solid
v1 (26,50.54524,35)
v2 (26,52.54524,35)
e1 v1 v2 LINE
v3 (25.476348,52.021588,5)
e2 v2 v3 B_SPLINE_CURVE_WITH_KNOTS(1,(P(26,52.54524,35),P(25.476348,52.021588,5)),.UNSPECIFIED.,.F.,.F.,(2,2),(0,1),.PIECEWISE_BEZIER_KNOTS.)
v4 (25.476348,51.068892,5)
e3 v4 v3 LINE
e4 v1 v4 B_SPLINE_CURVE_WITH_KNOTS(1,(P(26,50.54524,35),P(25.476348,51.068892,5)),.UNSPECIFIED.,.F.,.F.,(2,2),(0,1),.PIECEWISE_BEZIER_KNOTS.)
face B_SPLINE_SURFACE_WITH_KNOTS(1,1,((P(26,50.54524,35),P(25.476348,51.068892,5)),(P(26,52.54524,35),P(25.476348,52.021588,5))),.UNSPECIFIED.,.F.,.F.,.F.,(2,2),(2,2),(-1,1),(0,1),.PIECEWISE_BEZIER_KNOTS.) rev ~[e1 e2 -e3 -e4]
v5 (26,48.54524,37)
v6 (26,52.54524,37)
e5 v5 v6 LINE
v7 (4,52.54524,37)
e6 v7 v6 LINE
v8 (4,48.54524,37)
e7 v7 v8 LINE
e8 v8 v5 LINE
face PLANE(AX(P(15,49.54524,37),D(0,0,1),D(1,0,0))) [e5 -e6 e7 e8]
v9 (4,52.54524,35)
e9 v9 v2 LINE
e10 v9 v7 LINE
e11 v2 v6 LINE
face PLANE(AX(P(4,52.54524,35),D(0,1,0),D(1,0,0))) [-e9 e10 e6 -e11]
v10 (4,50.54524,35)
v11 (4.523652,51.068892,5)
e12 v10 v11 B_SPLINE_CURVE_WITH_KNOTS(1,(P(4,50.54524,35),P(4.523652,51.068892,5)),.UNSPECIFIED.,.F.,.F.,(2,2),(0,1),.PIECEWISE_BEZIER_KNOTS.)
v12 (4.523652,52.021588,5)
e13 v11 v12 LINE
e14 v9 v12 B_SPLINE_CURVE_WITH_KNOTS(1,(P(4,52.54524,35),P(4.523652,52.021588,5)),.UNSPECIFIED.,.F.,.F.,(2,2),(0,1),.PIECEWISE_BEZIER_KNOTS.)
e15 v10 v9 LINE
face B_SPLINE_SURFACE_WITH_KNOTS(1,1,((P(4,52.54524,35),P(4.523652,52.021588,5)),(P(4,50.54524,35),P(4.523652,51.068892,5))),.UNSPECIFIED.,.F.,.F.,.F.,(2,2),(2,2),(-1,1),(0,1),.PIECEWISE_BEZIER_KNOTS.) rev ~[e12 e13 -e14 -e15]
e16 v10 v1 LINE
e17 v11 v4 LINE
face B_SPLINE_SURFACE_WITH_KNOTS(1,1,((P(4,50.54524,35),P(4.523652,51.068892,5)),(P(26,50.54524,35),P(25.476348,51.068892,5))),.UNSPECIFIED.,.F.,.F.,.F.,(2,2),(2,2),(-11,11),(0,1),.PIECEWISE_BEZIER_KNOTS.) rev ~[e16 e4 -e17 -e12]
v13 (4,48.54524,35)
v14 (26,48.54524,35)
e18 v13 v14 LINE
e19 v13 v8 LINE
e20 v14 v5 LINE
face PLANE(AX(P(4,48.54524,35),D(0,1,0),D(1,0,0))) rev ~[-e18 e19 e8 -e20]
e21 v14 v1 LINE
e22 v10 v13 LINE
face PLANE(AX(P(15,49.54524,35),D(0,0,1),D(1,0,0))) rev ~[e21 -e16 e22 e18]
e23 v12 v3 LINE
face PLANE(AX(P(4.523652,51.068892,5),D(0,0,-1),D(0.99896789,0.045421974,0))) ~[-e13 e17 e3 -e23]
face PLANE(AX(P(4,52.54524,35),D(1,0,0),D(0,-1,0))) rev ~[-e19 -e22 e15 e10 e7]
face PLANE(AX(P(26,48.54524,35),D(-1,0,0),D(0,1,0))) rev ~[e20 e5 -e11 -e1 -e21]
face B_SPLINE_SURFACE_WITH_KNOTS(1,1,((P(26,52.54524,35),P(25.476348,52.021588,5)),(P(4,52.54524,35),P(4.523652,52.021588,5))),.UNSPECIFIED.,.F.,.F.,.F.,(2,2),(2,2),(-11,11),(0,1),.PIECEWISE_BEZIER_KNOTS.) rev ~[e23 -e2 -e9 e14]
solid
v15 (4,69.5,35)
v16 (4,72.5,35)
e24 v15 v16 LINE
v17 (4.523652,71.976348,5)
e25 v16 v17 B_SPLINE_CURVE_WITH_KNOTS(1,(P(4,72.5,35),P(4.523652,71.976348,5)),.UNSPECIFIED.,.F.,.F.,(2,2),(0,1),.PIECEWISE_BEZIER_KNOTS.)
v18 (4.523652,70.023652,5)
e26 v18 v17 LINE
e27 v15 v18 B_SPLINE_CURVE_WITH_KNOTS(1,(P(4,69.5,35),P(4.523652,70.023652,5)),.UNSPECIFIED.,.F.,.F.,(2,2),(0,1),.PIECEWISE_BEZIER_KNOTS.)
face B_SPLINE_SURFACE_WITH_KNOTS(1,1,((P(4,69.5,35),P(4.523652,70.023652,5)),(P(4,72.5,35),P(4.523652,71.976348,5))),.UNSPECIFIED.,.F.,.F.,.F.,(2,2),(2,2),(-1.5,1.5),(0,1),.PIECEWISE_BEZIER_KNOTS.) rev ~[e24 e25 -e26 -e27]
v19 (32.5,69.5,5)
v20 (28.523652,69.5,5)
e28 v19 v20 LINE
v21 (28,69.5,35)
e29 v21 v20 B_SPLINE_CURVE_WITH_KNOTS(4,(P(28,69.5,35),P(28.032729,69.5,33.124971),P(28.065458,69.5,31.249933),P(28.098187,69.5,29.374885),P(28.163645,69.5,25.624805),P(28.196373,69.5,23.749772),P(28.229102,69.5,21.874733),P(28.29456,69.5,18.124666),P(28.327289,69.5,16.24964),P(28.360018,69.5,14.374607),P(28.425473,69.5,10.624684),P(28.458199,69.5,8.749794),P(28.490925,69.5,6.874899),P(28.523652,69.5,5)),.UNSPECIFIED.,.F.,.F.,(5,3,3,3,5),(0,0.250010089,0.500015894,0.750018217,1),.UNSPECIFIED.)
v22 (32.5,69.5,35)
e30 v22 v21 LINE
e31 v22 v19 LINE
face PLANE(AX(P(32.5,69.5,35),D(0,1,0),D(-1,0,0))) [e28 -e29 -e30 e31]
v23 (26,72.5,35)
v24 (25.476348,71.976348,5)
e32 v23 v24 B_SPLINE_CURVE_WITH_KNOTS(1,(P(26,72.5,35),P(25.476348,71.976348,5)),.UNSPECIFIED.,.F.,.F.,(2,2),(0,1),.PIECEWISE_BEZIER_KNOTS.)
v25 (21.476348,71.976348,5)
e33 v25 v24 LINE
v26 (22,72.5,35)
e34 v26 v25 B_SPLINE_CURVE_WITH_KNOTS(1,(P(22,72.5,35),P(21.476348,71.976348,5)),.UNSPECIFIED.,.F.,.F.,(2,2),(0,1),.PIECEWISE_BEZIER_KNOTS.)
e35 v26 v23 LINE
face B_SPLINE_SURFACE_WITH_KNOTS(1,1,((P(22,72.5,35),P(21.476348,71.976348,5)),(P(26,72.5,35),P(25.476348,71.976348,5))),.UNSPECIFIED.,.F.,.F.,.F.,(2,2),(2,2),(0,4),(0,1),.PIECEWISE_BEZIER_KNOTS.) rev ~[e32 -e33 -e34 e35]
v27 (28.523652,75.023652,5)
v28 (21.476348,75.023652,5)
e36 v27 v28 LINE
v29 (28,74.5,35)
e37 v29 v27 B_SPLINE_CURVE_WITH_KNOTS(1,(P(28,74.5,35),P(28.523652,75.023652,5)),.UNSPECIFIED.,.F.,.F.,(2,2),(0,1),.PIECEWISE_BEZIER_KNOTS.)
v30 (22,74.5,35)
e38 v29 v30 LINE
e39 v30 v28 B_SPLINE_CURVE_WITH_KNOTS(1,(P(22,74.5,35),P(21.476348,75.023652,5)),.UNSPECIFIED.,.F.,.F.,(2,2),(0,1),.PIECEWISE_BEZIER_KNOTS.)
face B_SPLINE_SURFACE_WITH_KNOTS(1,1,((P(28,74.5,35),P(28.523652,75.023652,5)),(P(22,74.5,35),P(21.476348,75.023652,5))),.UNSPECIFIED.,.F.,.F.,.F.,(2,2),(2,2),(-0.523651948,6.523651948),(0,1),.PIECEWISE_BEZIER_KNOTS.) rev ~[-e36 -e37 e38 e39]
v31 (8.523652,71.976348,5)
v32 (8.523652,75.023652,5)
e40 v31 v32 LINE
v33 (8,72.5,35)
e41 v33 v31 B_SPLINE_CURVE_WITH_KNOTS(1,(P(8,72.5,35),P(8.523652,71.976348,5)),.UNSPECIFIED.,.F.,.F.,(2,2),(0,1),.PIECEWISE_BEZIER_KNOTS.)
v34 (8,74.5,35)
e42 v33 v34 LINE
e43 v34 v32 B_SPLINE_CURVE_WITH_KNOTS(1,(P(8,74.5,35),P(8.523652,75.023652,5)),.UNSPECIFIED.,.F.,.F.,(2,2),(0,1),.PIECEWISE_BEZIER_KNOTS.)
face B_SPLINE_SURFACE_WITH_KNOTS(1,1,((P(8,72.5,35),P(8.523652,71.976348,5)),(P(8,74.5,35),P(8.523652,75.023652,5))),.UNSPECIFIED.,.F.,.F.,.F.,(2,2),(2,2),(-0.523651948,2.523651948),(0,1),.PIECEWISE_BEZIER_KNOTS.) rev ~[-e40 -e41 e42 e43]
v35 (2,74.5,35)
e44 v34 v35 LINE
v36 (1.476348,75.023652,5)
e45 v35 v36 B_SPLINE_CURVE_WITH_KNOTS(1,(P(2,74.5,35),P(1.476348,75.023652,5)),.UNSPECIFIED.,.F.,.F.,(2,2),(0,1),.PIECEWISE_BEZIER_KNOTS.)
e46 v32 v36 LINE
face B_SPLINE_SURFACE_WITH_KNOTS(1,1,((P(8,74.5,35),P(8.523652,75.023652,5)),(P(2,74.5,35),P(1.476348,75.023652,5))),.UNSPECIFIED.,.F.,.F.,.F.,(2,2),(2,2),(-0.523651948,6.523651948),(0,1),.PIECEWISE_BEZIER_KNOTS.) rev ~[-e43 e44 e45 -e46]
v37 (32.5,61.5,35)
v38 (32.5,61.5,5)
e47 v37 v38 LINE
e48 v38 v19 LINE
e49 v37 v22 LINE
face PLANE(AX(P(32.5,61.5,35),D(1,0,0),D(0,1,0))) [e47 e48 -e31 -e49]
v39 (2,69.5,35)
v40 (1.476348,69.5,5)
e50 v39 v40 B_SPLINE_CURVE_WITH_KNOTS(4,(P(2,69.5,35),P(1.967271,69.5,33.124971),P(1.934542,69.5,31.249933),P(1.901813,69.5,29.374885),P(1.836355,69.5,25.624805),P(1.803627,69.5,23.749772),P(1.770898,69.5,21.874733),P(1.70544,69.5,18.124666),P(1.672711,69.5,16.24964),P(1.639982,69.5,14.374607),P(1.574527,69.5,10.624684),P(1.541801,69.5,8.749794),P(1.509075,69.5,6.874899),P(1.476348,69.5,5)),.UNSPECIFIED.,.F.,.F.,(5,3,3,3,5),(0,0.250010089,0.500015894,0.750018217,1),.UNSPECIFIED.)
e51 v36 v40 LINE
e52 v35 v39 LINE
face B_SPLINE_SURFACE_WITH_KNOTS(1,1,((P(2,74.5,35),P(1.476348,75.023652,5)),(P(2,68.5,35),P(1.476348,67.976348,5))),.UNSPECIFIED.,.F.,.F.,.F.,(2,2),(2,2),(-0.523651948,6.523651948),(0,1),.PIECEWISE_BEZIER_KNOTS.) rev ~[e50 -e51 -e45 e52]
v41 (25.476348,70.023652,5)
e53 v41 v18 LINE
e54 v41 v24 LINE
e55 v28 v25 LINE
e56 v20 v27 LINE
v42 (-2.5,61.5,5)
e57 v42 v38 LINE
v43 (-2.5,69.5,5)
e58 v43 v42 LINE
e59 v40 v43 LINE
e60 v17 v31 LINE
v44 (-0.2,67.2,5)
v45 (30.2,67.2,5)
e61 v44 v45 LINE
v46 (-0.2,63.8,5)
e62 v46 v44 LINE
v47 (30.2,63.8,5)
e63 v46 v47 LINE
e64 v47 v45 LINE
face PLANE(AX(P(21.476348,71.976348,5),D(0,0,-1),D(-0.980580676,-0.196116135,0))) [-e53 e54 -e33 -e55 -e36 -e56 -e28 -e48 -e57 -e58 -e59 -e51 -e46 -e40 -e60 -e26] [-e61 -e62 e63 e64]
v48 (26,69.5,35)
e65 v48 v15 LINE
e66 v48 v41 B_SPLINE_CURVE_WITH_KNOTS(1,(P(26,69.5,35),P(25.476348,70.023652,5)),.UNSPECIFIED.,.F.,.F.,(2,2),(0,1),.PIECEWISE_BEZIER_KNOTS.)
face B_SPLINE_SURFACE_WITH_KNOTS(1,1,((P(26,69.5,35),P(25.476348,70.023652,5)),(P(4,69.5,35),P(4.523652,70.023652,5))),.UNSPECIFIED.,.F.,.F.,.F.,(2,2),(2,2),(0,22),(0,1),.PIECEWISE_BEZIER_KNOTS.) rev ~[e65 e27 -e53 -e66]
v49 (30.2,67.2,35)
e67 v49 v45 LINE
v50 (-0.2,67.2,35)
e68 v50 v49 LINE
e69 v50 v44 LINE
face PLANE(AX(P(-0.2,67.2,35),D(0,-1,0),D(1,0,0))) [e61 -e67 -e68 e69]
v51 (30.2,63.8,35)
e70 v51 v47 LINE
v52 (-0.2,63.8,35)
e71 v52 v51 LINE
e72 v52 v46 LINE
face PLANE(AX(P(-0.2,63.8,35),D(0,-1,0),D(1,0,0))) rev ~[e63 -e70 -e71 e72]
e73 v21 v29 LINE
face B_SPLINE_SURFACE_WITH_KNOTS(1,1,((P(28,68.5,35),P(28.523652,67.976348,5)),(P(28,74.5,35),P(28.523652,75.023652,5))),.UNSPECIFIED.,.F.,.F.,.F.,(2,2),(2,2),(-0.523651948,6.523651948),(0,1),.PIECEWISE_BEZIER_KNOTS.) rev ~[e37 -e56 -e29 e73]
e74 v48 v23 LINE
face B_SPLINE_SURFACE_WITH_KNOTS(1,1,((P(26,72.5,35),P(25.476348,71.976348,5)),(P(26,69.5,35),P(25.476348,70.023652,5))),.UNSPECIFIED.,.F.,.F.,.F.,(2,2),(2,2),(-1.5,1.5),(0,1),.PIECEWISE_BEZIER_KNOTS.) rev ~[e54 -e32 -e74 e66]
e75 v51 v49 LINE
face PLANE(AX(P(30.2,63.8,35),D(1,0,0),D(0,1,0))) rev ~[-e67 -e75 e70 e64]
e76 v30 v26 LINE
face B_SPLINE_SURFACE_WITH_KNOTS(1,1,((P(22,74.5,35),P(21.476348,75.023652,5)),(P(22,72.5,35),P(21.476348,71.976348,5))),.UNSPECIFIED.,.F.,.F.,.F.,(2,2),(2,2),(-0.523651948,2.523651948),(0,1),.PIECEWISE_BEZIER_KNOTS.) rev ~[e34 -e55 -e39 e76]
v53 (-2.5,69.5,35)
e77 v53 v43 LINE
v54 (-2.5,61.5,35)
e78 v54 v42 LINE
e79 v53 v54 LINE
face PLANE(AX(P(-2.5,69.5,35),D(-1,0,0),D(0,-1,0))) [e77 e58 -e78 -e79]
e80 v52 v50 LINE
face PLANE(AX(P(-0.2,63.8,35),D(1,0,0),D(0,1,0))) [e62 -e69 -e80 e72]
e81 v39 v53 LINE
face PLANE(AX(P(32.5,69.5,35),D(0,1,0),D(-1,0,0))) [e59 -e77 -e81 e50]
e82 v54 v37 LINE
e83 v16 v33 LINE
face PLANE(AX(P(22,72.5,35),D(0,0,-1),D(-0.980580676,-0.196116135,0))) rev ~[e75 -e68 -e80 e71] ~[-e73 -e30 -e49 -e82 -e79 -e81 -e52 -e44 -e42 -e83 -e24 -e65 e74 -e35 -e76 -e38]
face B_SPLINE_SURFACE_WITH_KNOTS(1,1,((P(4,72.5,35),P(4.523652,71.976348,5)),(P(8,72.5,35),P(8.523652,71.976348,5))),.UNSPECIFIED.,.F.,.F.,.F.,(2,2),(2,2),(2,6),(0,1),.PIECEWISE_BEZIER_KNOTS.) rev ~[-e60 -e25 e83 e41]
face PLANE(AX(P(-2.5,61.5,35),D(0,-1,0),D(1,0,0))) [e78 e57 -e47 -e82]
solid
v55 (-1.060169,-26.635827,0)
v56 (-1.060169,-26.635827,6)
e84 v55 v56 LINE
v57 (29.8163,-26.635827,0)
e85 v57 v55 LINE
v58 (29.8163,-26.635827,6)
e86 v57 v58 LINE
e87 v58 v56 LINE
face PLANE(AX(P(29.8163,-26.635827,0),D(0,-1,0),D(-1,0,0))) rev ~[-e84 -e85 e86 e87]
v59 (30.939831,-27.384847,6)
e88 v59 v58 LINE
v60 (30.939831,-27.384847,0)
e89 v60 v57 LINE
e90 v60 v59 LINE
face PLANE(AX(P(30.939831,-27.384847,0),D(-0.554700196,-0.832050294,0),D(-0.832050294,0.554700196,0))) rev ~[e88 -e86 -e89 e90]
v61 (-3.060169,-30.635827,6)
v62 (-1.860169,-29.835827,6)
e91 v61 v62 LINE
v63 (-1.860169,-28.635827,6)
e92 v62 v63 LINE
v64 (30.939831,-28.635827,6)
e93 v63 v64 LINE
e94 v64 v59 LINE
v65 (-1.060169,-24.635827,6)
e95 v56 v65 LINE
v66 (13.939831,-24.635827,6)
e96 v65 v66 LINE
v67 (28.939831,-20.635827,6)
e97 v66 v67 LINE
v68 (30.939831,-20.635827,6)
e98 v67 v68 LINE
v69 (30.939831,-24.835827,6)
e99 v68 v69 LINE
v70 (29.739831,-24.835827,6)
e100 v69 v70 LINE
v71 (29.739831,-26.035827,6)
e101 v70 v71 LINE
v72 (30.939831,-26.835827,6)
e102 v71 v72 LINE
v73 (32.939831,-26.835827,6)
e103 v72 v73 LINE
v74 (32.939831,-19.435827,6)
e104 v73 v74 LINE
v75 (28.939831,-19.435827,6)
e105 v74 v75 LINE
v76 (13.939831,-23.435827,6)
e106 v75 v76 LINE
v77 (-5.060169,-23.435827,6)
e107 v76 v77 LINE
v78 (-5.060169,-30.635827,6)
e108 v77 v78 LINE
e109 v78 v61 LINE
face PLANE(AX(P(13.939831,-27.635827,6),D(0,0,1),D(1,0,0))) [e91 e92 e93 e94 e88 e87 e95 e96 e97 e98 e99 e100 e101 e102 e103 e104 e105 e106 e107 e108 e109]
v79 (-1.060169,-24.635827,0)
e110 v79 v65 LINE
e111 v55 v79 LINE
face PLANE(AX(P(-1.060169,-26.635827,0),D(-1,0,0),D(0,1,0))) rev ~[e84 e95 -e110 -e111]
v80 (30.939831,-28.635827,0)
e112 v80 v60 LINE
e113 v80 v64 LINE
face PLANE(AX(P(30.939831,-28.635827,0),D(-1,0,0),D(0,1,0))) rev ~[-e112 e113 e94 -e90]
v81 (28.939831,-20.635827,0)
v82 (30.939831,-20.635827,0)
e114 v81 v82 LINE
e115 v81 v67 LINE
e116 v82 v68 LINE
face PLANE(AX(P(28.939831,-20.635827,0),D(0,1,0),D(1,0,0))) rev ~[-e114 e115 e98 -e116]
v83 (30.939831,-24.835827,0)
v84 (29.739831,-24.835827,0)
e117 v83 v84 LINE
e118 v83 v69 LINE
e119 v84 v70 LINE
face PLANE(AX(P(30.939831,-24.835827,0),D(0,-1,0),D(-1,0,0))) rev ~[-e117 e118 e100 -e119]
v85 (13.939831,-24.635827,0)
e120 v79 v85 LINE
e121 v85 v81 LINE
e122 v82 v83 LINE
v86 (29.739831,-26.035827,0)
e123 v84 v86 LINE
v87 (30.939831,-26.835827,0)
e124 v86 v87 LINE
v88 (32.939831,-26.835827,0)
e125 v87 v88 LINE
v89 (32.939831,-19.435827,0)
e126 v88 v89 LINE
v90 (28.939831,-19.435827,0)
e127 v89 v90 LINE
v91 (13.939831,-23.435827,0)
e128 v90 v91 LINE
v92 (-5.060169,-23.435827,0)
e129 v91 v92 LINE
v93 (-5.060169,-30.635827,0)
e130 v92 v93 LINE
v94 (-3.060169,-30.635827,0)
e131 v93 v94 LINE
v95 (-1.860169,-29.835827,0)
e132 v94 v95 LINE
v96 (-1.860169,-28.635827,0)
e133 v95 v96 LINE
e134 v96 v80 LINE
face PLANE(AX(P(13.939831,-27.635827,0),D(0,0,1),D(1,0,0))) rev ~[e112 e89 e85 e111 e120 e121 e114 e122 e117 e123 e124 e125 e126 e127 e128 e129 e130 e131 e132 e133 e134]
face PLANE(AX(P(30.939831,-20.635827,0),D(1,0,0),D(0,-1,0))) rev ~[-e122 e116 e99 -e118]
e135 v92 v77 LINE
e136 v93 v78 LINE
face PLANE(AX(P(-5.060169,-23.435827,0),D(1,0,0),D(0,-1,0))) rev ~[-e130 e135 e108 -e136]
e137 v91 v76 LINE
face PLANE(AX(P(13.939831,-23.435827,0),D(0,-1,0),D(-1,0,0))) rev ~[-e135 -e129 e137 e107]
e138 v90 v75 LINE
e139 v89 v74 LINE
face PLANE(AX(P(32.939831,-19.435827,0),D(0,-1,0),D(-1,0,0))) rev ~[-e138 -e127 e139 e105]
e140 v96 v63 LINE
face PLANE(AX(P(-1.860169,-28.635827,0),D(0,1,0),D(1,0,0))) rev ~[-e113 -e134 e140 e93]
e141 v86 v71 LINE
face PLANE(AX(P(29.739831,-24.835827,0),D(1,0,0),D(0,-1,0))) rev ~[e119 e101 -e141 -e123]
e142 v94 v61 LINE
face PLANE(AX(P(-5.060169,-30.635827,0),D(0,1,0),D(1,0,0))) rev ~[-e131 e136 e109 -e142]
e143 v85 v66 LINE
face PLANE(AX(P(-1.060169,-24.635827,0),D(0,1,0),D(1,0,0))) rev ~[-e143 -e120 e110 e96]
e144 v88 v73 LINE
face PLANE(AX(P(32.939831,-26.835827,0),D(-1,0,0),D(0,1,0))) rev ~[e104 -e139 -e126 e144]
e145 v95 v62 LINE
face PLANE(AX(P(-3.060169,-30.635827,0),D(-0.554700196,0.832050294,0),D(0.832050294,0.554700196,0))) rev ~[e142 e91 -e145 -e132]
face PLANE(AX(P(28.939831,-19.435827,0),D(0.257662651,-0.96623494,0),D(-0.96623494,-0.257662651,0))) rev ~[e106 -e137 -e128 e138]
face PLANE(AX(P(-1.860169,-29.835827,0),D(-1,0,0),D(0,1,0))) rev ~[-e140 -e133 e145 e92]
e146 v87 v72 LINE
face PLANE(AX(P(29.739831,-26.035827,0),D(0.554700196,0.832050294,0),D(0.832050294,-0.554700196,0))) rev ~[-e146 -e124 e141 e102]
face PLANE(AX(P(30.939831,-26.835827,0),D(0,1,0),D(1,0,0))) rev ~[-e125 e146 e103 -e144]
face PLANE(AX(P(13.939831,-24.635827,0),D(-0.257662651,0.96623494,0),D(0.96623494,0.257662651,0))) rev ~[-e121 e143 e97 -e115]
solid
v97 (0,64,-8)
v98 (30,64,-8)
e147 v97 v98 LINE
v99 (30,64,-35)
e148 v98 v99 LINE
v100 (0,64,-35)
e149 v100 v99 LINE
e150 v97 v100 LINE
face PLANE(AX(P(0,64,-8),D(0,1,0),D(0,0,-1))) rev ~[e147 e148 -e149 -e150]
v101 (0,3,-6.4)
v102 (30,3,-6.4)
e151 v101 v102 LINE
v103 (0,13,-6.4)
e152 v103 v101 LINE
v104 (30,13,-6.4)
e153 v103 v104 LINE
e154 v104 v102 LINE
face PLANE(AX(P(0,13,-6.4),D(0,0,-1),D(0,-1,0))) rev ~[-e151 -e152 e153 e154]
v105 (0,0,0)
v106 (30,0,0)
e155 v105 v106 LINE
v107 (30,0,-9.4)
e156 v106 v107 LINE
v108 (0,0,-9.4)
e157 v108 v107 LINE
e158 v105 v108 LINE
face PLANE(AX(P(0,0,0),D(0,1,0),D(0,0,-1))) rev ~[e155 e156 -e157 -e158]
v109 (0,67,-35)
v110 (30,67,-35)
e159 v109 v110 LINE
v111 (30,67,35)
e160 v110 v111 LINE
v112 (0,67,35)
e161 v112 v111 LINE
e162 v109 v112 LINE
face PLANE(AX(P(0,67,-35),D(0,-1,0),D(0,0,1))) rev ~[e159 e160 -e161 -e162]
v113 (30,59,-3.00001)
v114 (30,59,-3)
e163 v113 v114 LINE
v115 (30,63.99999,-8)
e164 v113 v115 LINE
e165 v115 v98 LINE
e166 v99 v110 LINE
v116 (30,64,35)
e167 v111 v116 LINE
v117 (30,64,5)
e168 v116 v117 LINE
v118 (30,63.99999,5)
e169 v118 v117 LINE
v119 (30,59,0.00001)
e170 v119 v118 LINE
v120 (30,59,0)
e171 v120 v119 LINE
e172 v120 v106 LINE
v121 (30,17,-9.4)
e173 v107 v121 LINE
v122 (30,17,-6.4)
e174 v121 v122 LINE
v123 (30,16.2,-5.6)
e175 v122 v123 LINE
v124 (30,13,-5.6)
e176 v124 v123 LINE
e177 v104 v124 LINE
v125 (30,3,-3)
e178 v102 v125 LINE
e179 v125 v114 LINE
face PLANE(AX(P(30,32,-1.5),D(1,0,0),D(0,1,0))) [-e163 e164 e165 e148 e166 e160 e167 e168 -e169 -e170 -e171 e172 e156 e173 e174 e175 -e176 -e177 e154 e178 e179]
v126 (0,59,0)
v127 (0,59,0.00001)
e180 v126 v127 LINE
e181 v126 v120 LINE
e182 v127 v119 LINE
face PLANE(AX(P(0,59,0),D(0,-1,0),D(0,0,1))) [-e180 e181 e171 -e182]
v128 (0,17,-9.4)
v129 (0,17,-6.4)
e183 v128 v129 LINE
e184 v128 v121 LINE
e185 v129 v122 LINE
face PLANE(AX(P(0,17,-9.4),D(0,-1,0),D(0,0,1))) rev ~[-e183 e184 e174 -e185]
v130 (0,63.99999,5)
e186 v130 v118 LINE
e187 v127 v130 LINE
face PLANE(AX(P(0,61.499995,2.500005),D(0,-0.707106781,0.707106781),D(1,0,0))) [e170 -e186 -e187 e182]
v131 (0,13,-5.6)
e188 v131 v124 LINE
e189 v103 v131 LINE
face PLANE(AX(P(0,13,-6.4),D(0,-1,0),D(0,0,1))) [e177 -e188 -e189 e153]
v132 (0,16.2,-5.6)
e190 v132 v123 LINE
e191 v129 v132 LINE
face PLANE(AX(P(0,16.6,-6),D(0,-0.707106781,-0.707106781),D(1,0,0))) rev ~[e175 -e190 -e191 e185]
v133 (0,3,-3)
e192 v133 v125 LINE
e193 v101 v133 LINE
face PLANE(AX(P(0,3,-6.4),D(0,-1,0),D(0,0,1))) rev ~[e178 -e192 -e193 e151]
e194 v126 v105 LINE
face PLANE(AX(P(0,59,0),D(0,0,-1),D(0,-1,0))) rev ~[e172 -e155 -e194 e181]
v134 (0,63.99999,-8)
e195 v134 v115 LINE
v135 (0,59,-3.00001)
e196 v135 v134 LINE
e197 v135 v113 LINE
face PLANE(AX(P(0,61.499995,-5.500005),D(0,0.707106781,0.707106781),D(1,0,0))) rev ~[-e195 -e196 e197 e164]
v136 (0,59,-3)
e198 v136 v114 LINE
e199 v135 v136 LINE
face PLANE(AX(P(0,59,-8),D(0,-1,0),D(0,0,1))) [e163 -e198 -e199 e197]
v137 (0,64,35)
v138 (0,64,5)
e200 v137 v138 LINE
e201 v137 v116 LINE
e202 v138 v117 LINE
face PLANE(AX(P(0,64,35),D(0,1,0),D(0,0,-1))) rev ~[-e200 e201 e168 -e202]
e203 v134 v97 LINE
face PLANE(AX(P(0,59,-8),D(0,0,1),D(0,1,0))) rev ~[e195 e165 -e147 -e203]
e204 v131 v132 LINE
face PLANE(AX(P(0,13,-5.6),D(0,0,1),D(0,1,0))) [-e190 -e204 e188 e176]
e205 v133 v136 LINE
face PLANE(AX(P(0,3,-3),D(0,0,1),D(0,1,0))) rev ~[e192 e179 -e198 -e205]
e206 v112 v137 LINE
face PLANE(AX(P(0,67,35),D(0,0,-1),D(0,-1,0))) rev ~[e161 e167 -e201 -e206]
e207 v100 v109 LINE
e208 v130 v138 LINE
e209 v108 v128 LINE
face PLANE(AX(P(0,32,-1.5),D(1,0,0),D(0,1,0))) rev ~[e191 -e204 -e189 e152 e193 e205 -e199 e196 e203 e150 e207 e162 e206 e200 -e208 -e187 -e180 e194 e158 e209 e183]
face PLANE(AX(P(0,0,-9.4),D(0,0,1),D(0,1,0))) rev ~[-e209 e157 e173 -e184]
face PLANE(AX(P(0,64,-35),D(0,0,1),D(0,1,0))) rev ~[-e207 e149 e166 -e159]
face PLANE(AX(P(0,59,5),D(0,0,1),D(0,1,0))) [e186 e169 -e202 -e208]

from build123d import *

# Parameters (mm, degrees)
F0_W      = 5
F0_H      = 5
F0_W_2    = 4
F0_H_2    = 0.8
F1_DEPTH  = 30
F3_W      = 30.4
F3_H      = 3.4
F4_DEPTH  = 30
F5_SIZE   = 0.8
F6_SIZE   = 4.99999
F3_W_2    = 22
F3_H_2    = 2
F7_DEPTH  = 30
F7_TAPER  = 1
F8_DEPTH  = 2
F9_W      = 30
F9_H      = 2
F9_W_2    = 15
F9_H_2    = 1.2
F9_W_3    = 2
F10_DEPTH = 6
F3_W_3    = 2
F3_H_3    = 3
F11_DEPTH = 30
F11_TAPER = -1


# Not quite as in the source:
# - a fillet or chamfer is up to 0.001 mm smaller than in the source, because OpenCascade refuses the exact size
# - a feature names something its author has since deleted; it is built from what else it names


with BuildPart() as f1:
    # F0 (on Right) → F1 (new body)
    with BuildSketch(Plane.YZ):
        Polygon((59, 0), (0, 0), (0, -3), (3, -3), (59, -3), (64, -3), (64, 0), align=None)
        with Locations((61.5, 2.5)):
            Rectangle(F0_W, F0_H)
        Polygon((3, -3), (0, -3), (0, -9.4), (3, -9.4), (3, -6.4), align=None)
        Polygon((67, 0), (64, 0), (64, -3), (64, -8), (64, -35), (67, -35), align=None)
        Polygon((64, 5), (64, 0), (67, 0), (67, 35), (64, 35), align=None)
        with Locations((61.5, -5.5)):
            Rectangle(F0_W, F0_H)
        Polygon((13, -6.4), (3, -6.4), (3, -9.4), (17, -9.4), (17, -6.4), align=None)
        with Locations((15, -6)):
            Rectangle(F0_W_2, F0_H_2)
    extrude(amount=F1_DEPTH)

    # F5
    f5_edges = [f1.edges().sort_by_distance(p)[0] for p in [
        (15, 17, -5.6),
    ]]
    chamfer(f5_edges, length=F5_SIZE)

    # F6 (size 5 in the source; OpenCascade refuses exactly that, so slightly less here)
    f6_edges = [f1.edges().sort_by_distance(p)[0] for p in [
        (15, 59, 5),
        (15, 59, -8),
    ]]
    chamfer(f6_edges, length=F6_SIZE)


with BuildPart() as f4:
    # F3 (on offset) → F4 (new body)
    with BuildSketch(Plane.XY.offset(35)):
        Polygon((2, 69.5), (-2.5, 69.5), (-2.5, 61.5), (32.5, 61.5), (32.5, 69.5), (28, 69.5), (28, 68.5), (2, 68.5), align=None)
        with Locations((15, 65.5)):
            Rectangle(F3_W, F3_H, mode=Mode.SUBTRACT)
        Polygon((4, 69.5), (2, 69.5), (2, 68.5), (28, 68.5), (28, 69.5), (26, 69.5), align=None)
    extrude(amount=-F4_DEPTH)

    # F3 (on offset) → F11 (join)
    with BuildSketch(Plane.XY.offset(35)):
        Polygon((22, 72.5), (26, 72.5), (28, 72.5), (28, 74.5), (22, 74.5), align=None)
        with Locations((27, 71)):
            Rectangle(F3_W_3, F3_H_3)
        Polygon((4, 69.5), (2, 69.5), (2, 68.5), (28, 68.5), (28, 69.5), (26, 69.5), align=None)
        Polygon((2, 74.5), (2, 72.5), (4, 72.5), (8, 72.5), (8, 74.5), align=None)
        with Locations((3, 71)):
            Rectangle(F3_W_3, F3_H_3)
    extrude(amount=-F11_DEPTH, taper=F11_TAPER)


with BuildPart() as f7:
    # F3 (on offset) → F7 (new body)
    with BuildSketch(Plane.XY.offset(35)):
        with Locations((15, 51.545239985)):
            Rectangle(F3_W_2, F3_H_2)
    extrude(amount=-F7_DEPTH, taper=F7_TAPER)

    # F3 (on offset) → F8 (join)
    with BuildSketch(Plane.XY.offset(35)):
        with Locations((15, 49.545239985)):
            Rectangle(F3_W_2, F3_H_2)
        with Locations((15, 51.545239985)):
            Rectangle(F3_W_2, F3_H_2)
    extrude(amount=F8_DEPTH)


with BuildPart() as f10:
    # F9 (on Top) → F10 (new body)
    with BuildSketch(Plane.XY):
        with Locations((13.9398306429, -27.6358266532)):
            Rectangle(F9_W, F9_H)
        Polygon((-1.0601693571, -28.6358266532), (-1.0601693571, -26.6358266532), (-1.0601693571, -24.6358266532), (-1.0601693571, -23.4358266532), (-5.0601693571, -23.4358266532), (-5.0601693571, -28.6358266532), (-3.0601693571, -28.6358266532), (-1.8601693571, -28.6358266532), align=None)
        with Locations((6.4398306429, -24.0358266532)):
            Rectangle(F9_W_2, F9_H_2)
        Polygon((13.9398306429, -23.4358266532), (13.9398306429, -24.6358266532), (28.9398306429, -20.6358266532), (28.9398306429, -19.4358266532), align=None)
        Polygon((29.8163002714, -26.6358266532), (28.9398306429, -26.6358266532), (28.9398306429, -28.6358266532), (30.9398306429, -28.6358266532), (30.9398306429, -27.3848469009), align=None)
        Polygon((28.9398306429, -19.4358266532), (28.9398306429, -20.6358266532), (30.9398306429, -20.6358266532), (32.9398306429, -20.6358266532), (32.9398306429, -19.4358266532), align=None)
        Polygon((30.9398306429, -24.8358266532), (30.9398306429, -26.6358266532), (30.9398306429, -26.8358266532), (32.9398306429, -26.8358266532), (32.9398306429, -20.6358266532), (30.9398306429, -20.6358266532), align=None)
        Polygon((29.7398306429, -26.0358266532), (30.6398306429, -26.6358266532), (30.9398306429, -26.6358266532), (30.9398306429, -24.8358266532), (29.7398306429, -24.8358266532), align=None)
        with Locations((-4.0601693571, -29.6358266532)):
            Rectangle(F9_W_3, F9_H)
        Polygon((-1.8601693571, -29.8358266532), (-1.8601693571, -28.6358266532), (-3.0601693571, -28.6358266532), (-3.0601693571, -30.6358266532), align=None)
        Polygon((30.9398306429, -26.6358266532), (30.6398306429, -26.6358266532), (30.9398306429, -26.8358266532), align=None)
    extrude(amount=F10_DEPTH)


solid = Compound([f1.part, f4.part, f7.part, f10.part])
